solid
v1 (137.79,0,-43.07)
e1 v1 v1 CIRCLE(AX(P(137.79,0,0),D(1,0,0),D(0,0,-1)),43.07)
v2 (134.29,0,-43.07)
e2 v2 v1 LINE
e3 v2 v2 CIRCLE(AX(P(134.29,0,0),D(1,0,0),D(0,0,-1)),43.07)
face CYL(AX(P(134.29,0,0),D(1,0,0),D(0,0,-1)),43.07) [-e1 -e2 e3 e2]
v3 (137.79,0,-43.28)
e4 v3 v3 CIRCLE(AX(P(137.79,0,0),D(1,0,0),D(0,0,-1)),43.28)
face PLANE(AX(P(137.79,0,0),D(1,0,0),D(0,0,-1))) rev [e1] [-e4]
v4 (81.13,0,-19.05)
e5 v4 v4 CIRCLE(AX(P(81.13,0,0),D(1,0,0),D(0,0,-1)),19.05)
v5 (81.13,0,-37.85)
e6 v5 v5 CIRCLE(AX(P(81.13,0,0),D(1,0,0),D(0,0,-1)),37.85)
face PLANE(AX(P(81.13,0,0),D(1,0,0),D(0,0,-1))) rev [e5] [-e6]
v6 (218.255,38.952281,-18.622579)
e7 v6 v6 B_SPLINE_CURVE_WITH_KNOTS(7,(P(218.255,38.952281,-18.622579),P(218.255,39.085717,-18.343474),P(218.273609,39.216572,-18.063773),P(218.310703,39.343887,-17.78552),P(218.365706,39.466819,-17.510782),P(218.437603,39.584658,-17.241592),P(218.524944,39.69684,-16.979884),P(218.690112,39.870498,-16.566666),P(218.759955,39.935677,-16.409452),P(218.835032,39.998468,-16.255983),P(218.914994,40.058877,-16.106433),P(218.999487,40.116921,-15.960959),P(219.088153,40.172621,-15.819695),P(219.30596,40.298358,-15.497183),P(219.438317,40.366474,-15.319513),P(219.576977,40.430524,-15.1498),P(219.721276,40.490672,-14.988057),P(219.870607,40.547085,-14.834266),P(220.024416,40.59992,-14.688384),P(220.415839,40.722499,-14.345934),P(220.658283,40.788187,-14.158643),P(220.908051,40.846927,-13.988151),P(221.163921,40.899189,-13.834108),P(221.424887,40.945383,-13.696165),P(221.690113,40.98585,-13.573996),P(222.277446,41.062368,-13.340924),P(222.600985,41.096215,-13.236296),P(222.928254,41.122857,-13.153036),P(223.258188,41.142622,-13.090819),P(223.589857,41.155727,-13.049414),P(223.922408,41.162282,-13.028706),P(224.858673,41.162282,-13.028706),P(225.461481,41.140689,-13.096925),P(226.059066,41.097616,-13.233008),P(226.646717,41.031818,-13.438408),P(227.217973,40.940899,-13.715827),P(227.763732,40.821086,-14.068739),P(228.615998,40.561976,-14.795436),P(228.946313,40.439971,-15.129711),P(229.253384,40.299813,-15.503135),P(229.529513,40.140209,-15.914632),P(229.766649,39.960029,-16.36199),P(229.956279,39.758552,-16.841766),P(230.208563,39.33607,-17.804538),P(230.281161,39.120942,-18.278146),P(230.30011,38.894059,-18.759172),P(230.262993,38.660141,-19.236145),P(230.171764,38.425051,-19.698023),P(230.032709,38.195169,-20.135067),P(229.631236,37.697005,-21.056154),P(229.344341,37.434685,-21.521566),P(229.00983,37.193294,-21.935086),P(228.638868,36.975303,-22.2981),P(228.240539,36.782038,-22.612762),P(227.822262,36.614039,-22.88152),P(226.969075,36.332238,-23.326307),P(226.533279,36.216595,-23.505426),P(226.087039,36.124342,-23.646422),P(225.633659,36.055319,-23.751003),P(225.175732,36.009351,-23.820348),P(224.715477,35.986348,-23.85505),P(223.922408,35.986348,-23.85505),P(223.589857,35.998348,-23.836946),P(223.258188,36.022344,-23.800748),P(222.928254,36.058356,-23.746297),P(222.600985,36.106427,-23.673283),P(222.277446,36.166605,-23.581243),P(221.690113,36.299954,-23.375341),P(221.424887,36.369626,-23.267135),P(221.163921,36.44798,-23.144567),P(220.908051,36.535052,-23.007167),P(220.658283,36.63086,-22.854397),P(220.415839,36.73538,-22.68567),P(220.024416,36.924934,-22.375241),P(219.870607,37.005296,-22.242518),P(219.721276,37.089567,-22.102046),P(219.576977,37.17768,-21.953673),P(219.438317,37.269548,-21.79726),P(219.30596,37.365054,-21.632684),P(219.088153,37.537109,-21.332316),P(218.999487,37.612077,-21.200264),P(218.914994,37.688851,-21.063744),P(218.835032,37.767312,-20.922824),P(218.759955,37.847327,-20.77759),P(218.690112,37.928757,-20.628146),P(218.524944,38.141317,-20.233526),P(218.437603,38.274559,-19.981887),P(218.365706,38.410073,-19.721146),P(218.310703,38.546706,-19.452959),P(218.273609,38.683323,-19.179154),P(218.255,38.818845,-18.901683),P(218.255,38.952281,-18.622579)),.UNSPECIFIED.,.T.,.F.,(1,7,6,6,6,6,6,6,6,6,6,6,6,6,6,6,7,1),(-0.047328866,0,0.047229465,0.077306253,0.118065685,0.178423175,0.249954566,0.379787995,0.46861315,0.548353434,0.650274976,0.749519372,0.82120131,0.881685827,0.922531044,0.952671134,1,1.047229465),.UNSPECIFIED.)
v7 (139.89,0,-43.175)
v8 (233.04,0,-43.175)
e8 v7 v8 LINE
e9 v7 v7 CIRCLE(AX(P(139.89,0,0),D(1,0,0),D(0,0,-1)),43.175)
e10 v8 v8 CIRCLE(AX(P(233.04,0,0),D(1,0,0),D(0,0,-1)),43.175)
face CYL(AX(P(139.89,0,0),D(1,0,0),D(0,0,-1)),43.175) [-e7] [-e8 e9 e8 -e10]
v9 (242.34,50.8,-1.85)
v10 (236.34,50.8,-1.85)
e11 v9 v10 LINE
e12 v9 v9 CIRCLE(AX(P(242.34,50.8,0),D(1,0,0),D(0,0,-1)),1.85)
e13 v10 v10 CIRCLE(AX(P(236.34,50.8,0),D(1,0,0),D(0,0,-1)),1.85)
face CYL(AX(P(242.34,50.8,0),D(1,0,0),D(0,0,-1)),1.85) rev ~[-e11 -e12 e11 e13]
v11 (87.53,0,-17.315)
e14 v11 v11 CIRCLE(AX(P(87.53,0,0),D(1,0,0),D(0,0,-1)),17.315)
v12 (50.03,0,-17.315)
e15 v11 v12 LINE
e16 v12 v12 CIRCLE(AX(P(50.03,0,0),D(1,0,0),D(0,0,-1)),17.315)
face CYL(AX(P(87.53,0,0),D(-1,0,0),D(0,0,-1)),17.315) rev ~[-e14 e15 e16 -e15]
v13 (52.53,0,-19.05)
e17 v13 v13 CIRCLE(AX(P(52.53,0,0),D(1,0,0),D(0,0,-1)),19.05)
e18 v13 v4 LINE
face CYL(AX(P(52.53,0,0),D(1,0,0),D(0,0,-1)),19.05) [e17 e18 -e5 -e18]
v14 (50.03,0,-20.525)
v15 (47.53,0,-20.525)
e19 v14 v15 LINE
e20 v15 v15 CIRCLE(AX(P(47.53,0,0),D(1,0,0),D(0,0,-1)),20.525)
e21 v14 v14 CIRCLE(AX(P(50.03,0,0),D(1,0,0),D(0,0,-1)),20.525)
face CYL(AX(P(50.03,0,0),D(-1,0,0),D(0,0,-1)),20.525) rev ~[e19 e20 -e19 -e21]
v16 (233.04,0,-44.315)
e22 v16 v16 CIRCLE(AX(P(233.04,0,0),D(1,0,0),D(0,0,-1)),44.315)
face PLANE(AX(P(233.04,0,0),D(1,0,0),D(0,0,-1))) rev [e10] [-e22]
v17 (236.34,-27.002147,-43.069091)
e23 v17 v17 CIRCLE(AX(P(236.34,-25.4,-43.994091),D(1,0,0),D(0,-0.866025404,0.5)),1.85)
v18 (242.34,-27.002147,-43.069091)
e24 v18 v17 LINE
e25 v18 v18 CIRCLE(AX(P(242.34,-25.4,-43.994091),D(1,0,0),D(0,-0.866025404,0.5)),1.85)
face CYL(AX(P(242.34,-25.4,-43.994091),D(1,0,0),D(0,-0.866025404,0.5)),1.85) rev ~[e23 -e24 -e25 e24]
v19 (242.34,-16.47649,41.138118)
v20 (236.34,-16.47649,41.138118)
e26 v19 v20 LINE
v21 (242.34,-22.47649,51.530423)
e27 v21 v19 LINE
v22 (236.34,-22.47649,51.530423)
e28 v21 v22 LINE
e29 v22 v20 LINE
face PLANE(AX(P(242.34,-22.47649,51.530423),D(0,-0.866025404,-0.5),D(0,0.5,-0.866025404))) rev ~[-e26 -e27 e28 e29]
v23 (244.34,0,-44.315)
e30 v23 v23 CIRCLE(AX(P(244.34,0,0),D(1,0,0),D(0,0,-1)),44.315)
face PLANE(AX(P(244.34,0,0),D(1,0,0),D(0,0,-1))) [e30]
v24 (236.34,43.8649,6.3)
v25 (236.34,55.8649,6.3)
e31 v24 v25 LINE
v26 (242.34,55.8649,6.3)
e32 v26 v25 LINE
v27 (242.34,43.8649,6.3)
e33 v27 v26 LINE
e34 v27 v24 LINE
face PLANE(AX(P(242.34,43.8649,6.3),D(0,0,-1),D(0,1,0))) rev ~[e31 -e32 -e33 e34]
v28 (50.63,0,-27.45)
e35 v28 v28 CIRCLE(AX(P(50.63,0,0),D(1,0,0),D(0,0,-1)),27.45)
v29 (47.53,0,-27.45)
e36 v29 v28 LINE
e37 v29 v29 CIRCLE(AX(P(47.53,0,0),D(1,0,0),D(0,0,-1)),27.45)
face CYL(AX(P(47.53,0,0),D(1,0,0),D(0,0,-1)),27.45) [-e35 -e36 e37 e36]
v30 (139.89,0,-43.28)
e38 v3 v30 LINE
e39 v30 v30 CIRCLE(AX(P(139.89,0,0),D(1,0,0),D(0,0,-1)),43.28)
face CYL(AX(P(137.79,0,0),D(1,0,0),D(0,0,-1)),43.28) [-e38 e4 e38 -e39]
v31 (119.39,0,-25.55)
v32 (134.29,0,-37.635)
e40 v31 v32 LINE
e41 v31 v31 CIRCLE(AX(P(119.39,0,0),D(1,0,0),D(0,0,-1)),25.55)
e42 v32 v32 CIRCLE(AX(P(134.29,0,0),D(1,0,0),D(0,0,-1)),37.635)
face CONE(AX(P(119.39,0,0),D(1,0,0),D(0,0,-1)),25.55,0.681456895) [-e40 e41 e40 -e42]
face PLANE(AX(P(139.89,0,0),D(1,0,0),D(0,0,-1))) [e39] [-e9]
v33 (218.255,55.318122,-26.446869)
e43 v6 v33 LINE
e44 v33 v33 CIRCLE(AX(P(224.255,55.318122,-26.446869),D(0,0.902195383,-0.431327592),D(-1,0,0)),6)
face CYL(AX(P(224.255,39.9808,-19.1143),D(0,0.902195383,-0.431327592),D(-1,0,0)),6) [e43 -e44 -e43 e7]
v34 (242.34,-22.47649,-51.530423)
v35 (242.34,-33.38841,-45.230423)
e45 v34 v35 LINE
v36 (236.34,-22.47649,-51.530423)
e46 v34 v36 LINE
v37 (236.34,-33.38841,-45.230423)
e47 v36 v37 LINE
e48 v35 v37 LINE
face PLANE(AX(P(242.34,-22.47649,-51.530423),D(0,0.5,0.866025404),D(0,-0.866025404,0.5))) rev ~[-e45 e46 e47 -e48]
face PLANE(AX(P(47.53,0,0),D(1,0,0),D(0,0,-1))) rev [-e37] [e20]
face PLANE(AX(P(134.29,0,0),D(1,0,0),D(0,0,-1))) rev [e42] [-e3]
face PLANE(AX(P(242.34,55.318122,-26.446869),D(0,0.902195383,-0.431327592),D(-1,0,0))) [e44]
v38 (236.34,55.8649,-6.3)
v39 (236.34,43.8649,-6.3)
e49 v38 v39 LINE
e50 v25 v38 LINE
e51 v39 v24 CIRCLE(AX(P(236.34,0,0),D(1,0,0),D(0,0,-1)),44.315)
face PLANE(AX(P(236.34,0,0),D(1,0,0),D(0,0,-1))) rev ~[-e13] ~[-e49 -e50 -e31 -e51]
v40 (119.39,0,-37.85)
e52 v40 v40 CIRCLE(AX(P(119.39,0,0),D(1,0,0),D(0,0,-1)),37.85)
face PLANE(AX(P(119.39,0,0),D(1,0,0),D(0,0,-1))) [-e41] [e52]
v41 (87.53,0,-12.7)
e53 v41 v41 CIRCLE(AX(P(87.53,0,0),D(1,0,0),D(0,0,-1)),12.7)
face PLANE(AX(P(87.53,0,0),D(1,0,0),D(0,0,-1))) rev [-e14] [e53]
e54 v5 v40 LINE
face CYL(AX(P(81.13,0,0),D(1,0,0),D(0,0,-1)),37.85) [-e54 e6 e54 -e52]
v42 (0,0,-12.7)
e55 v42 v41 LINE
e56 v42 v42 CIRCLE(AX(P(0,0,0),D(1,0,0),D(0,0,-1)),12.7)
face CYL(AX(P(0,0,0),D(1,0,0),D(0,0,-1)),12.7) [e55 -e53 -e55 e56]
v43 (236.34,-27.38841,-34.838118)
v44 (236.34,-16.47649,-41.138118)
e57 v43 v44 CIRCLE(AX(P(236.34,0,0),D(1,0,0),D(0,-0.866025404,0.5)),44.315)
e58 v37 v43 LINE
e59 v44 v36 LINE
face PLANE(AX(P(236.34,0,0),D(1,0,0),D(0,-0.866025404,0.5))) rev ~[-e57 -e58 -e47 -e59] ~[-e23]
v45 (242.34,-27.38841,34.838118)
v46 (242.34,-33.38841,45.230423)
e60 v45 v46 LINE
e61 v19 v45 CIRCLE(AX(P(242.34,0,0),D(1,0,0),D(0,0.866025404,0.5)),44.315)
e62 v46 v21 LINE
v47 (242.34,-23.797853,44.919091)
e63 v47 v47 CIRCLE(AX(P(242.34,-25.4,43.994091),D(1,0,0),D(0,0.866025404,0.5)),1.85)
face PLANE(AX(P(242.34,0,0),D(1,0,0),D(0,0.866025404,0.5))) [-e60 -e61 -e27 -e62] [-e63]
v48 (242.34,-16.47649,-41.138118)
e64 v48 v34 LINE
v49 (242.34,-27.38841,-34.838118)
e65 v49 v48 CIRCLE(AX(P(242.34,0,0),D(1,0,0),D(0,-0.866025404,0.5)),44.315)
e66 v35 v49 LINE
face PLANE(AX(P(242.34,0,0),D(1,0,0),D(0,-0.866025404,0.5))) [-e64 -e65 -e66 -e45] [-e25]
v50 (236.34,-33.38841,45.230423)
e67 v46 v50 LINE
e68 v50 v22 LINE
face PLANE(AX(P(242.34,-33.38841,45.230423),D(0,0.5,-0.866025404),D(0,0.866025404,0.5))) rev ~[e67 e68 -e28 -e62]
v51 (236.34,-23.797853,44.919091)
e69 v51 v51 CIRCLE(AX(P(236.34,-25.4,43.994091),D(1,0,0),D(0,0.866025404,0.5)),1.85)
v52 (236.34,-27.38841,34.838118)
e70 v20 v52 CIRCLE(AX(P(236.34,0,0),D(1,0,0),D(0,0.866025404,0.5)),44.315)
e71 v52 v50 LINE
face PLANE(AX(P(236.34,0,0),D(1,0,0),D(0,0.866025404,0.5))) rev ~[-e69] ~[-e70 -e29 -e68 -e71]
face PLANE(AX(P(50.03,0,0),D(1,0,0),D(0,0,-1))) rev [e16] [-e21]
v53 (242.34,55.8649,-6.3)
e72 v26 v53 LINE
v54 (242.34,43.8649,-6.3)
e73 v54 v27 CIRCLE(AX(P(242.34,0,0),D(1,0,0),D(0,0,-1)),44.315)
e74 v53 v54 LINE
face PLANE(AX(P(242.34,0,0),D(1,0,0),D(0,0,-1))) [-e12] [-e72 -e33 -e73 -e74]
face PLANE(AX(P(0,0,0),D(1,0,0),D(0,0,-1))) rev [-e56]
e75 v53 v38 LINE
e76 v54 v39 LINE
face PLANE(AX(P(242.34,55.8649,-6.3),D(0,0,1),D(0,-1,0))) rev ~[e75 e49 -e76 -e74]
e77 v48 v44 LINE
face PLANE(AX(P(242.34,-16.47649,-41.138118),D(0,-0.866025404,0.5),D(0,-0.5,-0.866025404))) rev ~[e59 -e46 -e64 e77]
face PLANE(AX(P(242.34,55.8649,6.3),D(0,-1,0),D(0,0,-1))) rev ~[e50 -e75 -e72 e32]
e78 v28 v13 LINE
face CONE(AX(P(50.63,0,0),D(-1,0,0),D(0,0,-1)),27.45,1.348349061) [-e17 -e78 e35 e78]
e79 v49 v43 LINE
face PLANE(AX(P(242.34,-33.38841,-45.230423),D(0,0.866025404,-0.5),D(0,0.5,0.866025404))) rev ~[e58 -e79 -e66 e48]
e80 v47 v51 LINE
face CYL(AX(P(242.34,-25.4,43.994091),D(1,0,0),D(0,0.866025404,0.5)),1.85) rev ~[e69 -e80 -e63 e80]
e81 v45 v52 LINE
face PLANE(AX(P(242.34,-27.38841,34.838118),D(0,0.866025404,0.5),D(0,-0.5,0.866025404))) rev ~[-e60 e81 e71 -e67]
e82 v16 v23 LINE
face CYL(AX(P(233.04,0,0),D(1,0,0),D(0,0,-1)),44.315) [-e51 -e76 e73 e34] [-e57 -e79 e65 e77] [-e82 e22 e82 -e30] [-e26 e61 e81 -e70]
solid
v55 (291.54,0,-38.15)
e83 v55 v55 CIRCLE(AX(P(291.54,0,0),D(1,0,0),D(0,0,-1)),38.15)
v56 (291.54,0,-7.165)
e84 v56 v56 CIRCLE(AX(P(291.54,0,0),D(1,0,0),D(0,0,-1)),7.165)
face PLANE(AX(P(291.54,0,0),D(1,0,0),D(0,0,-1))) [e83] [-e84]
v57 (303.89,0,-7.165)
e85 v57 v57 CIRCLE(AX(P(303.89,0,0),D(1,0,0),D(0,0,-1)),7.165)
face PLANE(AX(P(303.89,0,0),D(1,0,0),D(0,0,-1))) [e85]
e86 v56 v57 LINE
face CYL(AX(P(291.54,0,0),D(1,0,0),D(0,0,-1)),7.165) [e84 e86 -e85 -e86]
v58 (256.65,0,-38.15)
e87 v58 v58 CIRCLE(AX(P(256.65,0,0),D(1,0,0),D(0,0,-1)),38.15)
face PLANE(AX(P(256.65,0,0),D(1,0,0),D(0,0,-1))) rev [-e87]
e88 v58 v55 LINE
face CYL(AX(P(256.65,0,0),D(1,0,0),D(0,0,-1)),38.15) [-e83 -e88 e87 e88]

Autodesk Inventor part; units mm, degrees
ref_plane "YZ Plane" through (0, 0, 0) normal (1, 0, 0) x (0, 1, 0)
sketch "Sketch1" plane through (0, 0, 0) normal (0, 1, 0) x (-1, 0, 0)
  line L0 (0, 0) -> (-303.89, 0)
  line L1 (0, 0) -> (0, -12.7)
  line L2 (0, -12.7) -> (-87.53, -12.7)
  line L3 (-87.53, -12.7) -> (-87.53, -17.315)
  line L4 (-87.53, -17.315) -> (-50.03, -17.315)
  line L5 (-50.03, -17.315) -> (-50.03, -20.525)
  line L6 (-50.03, -20.525) -> (-47.53, -20.525)
  line L7 (-47.53, -20.525) -> (-47.53, -27.45)
  line L8 (-47.53, -27.45) -> (-50.63, -27.45)
  line L9 (-50.63, -27.45) -> (-52.53, -19.05)
  line L10 (-52.53, -19.05) -> (-81.13, -19.05)
  line L11 (-81.13, -19.05) -> (-81.13, -37.85)
  line L12 (-81.13, -37.85) -> (-119.39, -37.85)
  line L13 (-119.39, -37.85) -> (-119.39, -25.55)
  line L14 (-119.39, -25.55) -> (-134.29, -37.635)
  line L15 (-134.29, -37.635) -> (-134.29, -43.07)
  line L16 (-134.29, -43.07) -> (-137.79, -43.07)
  line L17 (-137.79, -43.07) -> (-137.79, -43.28)
  line L18 (-137.79, -43.28) -> (-139.89, -43.28)
  line L19 (-139.89, -43.28) -> (-139.89, -43.175)
  line L20 (-139.89, -43.175) -> (-233.04, -43.175)
  line L21 (-233.04, -43.175) -> (-233.04, -44.315)
  line L22 (-233.04, -44.315) -> (-244.34, -44.315)
  line L23 (-244.34, -44.315) -> (-244.34, 0)
  line L24 (-256.65, 0) -> (-256.65, -38.15)
  line L25 (-256.65, -38.15) -> (-291.54, -38.15)
  line L26 (-291.54, -38.15) -> (-291.54, -7.165)
  line L27 (-291.54, -7.165) -> (-303.89, -7.165)
  line L28 (-303.89, -7.165) -> (-303.89, 0)
  dimension "d0" = 303.89
  dimension "d1" = 12.7
  dimension "d2" = 87.53
  dimension "d3" = 4.615
  dimension "d4" = 37.5
  dimension "d5" = 3.21
  dimension "d6" = 2.5
  dimension "d7" = 27.45
  dimension "d8" = 3.1
  dimension "d9" = 5
  dimension "d10" = 19.05
  dimension "d11" = 30.5
  dimension "d12" = 37.85
  dimension "d13" = 38.26
  dimension "d14" = 12.3
  dimension "d16" = 14.9
  dimension "d17" = 37.635
  dimension "d18" = 43.07
  dimension "d19" = 3.5
  dimension "d20" = 43.28
  dimension "d21" = 2.1
  dimension "d22" = 43.175
  dimension "d23" = 98.75
  dimension "d24" = 44.315
  dimension "d25" = 110.05
  dimension "d26" = 12.31
  dimension "d27" = 157.25
  dimension "d28" = 38.15
  dimension "d29" = 90
  dimension "d30" = 7.165
  dimension "d31" = 12.35
revolve "Revolution1" add sketch "Sketch1" angle 360 about axis through (0, 0, 0) along (1, 0, 0)
ref_plane "Work Plane1" through (242.34, 0, 0) normal (1, 0, 0) x (0, 0, -1)
sketch "Sketch3" plane through (242.34, 0, 0) normal (1, 0, 0) x (0, 0, -1)
  circle A0 centre (0, 0) radius 44.315 projected
  line L0 (-6.3, 55.8649) -> (6.3, 55.8649)
  line L1 (6.3, 55.8649) -> (6.3, 43.8649)
  line L2 (6.3, 43.8649) -> (-6.3, 43.8649)
  line L3 (-6.3, 43.8649) -> (-6.3, 55.8649)
  circle A1 centre (0, 50.8) radius 1.85
  line L4 (-6.3, 44.315) -> (6.3, 44.315) construction
  line L5 (124.271, 70.9929) -> (36.131, 70.9929)
  line L6 (36.131, 70.9929) -> (80.201, 147.3244)
  line L7 (80.201, 147.3244) -> (124.271, 70.9929)
  circle A2 centre (80.201, 96.4367) radius 50.8877
  circle A3 centre (0, 0) radius 50.8 construction
  point P0 (0, 55.8649)
  point P1 (0, 44.315)
  point P2 (19.1143, 39.9808)
  dimension "d51" = 101.7753
  dimension "d53" = 101.6
  dimension "d35" = 12.6
  dimension "d36" = 12
  dimension "d37" = 3.7
  dimension "d45" = 13.39
  dimension "d50" = 88.14
extrude "Extrusion1" add sketch "Sketch3" against normal blind 6 contours A0 L3 L0 L1
pattern_circular "Circular Pattern1" count 3 over 360 about axis through (-10, 0, 0) along (1, 0, 0) of "Extrusion1"
ref_plane "Work Plane2" through (242.34, 39.9808, -19.1143) normal (0, 0.9021954, -0.4313276) x (-1, 0, 0)
sketch "Sketch5" plane through (242.34, 39.9808, -19.1143) normal (0, 0.9021954, -0.4313276) x (-1, 0, 0)
  circle A0 centre (18.085, 0) radius 6
  line L0 (-2, 44.315) -> (-2, -44.315) projected
  point P0 (242.34, 0)
  point P1 (0, 0)
  dimension "d46" = 12
  dimension "d47" = 20.085
extrude "Extrusion2" add sketch "Sketch5" along normal mid plane 34
properties part number "STI Hybrid 98 Cryocooler"
